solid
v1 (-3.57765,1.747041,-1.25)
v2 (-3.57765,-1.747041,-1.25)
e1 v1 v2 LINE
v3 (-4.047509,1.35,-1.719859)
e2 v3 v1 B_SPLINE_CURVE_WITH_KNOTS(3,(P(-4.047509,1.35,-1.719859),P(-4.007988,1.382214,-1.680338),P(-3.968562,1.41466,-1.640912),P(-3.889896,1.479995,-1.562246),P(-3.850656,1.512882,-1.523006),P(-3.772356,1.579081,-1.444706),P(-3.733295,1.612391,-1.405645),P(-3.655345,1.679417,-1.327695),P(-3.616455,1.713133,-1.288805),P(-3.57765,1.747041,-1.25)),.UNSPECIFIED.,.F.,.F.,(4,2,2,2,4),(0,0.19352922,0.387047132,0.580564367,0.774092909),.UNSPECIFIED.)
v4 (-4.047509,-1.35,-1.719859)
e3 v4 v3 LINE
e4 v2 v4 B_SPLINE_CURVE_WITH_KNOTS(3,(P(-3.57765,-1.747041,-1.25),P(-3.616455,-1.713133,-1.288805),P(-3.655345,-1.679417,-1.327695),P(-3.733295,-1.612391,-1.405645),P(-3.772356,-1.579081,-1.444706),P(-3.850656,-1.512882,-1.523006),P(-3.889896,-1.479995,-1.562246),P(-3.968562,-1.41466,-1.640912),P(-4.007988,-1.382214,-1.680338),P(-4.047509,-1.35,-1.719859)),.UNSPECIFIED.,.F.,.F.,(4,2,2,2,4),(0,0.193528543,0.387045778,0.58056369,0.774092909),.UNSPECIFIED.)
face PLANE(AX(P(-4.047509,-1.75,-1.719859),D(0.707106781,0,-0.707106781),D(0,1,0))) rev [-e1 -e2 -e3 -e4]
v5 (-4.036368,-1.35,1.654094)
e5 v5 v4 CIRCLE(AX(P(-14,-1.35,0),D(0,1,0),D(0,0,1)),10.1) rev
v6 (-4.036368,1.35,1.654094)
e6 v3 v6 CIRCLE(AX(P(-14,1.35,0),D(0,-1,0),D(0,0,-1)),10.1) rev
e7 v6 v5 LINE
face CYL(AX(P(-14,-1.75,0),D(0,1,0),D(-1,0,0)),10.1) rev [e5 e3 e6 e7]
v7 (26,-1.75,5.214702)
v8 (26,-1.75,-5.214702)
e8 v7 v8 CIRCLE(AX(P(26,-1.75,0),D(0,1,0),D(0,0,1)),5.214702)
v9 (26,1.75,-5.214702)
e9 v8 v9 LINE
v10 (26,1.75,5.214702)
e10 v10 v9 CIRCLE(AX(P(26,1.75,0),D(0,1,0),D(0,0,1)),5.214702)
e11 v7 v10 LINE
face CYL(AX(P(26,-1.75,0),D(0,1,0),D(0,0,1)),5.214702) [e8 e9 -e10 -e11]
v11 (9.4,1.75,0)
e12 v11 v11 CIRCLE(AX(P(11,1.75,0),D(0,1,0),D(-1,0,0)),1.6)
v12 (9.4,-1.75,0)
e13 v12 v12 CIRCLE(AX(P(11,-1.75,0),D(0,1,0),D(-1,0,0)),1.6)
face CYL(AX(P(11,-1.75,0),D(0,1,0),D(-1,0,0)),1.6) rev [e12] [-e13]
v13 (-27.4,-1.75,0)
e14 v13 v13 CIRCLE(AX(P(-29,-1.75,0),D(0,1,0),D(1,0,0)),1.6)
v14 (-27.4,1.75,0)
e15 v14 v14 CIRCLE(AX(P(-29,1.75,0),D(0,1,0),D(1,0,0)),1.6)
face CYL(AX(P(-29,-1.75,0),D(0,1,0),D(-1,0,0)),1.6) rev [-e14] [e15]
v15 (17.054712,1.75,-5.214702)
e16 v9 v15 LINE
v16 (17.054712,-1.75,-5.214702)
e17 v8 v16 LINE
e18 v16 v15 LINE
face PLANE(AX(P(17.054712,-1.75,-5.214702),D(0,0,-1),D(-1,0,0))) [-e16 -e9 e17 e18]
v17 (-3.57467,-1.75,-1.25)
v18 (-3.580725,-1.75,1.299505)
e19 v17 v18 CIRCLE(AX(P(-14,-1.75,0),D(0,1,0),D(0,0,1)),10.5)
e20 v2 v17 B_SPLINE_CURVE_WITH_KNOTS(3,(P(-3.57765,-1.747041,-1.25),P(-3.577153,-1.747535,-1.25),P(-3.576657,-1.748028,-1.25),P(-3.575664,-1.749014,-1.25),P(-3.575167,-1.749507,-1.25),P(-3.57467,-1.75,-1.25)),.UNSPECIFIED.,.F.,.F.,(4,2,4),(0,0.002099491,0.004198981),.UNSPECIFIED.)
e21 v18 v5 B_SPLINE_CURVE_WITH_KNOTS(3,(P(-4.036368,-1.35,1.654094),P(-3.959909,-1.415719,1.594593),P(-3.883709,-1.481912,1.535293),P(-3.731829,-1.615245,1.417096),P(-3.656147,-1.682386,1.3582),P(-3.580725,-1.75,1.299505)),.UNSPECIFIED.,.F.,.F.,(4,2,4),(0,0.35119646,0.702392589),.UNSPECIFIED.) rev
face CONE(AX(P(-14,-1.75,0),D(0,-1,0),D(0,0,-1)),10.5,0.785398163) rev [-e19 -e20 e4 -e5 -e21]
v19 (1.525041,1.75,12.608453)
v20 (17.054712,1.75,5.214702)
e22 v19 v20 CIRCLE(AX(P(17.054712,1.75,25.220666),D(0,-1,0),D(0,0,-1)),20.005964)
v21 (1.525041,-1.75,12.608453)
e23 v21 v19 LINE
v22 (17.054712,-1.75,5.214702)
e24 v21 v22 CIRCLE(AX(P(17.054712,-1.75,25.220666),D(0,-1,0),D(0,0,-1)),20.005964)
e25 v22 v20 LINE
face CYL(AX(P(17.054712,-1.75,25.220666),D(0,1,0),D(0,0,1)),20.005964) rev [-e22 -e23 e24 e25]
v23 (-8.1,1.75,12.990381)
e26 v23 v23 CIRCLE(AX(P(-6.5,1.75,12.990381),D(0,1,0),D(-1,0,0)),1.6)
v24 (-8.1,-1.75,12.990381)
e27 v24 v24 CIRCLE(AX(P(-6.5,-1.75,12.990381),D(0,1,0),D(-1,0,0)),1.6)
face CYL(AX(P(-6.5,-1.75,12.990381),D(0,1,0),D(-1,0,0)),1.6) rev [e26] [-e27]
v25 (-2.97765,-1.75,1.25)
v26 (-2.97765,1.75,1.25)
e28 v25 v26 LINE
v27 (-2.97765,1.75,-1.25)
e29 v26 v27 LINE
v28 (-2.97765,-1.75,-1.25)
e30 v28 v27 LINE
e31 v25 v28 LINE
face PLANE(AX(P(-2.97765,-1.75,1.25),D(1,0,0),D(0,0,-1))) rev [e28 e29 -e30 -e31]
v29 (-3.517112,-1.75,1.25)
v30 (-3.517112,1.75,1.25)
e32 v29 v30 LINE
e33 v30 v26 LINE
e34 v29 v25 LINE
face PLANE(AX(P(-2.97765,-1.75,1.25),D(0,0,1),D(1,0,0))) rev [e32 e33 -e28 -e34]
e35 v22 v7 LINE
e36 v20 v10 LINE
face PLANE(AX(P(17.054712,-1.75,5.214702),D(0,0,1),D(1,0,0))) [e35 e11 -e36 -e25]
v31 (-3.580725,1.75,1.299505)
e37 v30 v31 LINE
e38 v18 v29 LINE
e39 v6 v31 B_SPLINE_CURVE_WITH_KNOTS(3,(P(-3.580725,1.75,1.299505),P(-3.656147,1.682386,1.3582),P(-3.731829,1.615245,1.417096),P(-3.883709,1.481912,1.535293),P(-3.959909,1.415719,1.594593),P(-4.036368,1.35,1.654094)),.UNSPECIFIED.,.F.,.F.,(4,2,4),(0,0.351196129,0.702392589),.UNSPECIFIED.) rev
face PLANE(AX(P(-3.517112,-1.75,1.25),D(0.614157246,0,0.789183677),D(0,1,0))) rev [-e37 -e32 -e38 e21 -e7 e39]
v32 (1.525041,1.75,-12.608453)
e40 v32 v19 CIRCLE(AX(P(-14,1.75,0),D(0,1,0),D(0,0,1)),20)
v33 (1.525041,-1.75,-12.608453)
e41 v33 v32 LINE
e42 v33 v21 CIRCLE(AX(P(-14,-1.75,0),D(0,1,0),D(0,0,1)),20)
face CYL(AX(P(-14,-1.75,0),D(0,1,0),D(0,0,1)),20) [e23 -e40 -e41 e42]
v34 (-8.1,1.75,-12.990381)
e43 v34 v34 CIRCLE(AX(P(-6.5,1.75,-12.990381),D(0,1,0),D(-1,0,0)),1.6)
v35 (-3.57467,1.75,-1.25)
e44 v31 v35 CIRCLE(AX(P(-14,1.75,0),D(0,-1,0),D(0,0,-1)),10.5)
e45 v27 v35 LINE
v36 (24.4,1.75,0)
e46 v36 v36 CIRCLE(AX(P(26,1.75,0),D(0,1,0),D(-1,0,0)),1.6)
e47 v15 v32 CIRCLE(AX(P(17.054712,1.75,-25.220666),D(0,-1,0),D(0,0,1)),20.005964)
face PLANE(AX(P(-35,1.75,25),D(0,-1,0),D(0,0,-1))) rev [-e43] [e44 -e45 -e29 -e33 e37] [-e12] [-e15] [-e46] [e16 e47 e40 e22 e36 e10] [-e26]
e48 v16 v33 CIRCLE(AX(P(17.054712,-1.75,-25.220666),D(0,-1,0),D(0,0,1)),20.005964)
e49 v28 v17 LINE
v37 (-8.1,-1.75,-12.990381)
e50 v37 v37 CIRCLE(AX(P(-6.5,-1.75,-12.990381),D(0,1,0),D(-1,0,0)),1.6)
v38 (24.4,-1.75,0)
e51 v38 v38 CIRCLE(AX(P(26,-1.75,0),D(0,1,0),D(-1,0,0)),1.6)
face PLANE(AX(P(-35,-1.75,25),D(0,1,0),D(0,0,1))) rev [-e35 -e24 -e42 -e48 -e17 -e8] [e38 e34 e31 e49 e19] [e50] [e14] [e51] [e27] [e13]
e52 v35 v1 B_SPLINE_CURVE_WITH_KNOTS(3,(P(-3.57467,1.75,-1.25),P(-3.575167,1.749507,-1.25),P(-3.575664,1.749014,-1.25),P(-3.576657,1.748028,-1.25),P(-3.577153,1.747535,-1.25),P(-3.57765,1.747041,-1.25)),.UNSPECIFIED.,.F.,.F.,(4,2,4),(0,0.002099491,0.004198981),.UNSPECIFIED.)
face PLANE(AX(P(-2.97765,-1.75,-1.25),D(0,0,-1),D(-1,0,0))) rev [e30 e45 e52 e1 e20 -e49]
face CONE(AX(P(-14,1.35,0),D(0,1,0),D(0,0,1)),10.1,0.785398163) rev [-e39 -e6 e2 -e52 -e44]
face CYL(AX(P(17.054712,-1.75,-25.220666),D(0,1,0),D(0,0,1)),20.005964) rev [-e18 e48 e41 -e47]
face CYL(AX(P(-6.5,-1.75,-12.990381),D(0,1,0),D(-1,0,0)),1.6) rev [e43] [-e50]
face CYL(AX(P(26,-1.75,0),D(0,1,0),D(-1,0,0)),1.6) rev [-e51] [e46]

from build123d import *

# Parameters (mm, degrees)
SKETCH1_W           = 70
SKETCH1_H           = 3.5
BOSS_EXTRUDE1_DEPTH = 25
SKETCH2_R           = 10.1
SKETCH2_R_2         = 1.6
CUT_EXTRUDE1_DEPTH  = 44.153794735
SKETCH4_OUTSIDE_W   = 89.218
SKETCH4_OUTSIDE_H   = 69.218
CUT_EXTRUDE2_DEPTH  = 44.153794735
SKETCH5_W           = 1
SKETCH5_H           = 2.5
CUT_EXTRUDE3_DEPTH  = 40.601136347
CHAMFER1_SIZE       = 0.460537939
CHAMFER1_SIZE_2     = 0.4


with BuildPart() as part:
    # Sketch1 → Boss-Extrude1 (new, symmetric)
    with BuildSketch(Plane.XY):
        Rectangle(SKETCH1_W, SKETCH1_H)
    extrude(amount=BOSS_EXTRUDE1_DEPTH, both=True)

    # Sketch2 → Cut-Extrude1 (cut, through all)
    with BuildSketch(Plane(origin=(0, 1.75, 0), x_dir=(1, 0, 0), z_dir=(0, 1, 0))):
        with Locations(Location((-14, 0, 0), (0, 0, 180))):
            Circle(SKETCH2_R)
        with Locations((-29, 0)):
            Circle(SKETCH2_R_2)
        with Locations(Location((-6.5, 12.990381057, 0), (0, 0, 180))):
            Circle(SKETCH2_R_2)
        with Locations(Location((-6.5, -12.990381057, 0), (0, 0, 180))):
            Circle(SKETCH2_R_2)
        with Locations(Location((11, 0, 0), (0, 0, 180))):
            Circle(SKETCH2_R_2)
        with Locations(Location((26, 0, 0), (0, 0, 180))):
            Circle(SKETCH2_R_2)
    extrude(amount=-CUT_EXTRUDE1_DEPTH, mode=Mode.SUBTRACT)

    # Sketch4 outside → Cut-Extrude2 (cut, through all)
    with BuildSketch(Plane(origin=(0, 1.75, 0), x_dir=(1, 0, 0), z_dir=(0, 1, 0))):
        Rectangle(SKETCH4_OUTSIDE_W, SKETCH4_OUTSIDE_H)
        with BuildLine():
            Line((17.054712149, -5.214702174), (26, -5.214702174))
            ThreePointArc((26, -5.214702174), (31.214702174, 0), (26, 5.214702174))
            Line((26, 5.214702174), (17.054712149, 5.214702174))
            ThreePointArc((17.054712149, 5.214702174), (8.454737914, 7.157470503), (1.525041378, 12.608453125))
            ThreePointArc((1.525041378, 12.608453125), (-34, 0), (1.525041378, -12.608453125))
            ThreePointArc((1.525041378, -12.608453125), (8.454737914, -7.157470503), (17.054712149, -5.214702174))
        make_face(mode=Mode.SUBTRACT)
    extrude(amount=-CUT_EXTRUDE2_DEPTH, mode=Mode.SUBTRACT)

    # Sketch5 → Cut-Extrude3 (cut, through all)
    with BuildSketch(Plane(origin=(0, 1.75, 0), x_dir=(1, 0, 0), z_dir=(0, 1, 0))):
        with Locations((-3.477649976, 0)):
            Rectangle(SKETCH5_W, SKETCH5_H)
    extrude(amount=-CUT_EXTRUDE3_DEPTH, mode=Mode.SUBTRACT)

    # Chamfer1
    # the kernel refuses this chamfer: 0.460537939, 0.4 mm, written as the material it takes off along each edge
    with BuildSketch(Plane(origin=(-3.977649976, 2.93802649, 1.25), x_dir=(1, 0, 0), z_dir=(0, -1, 0))) as chamfer1_piece_1:
        with BuildLine():
            Line((CHAMFER1_SIZE, 0), (-0.058717526, 0.404094149))
            ThreePointArc((-0.058717526, 0.404094149), (-0.028274639, 0.208923305), (0, 0))
            Line((0, 0), (CHAMFER1_SIZE, 0))
        make_face()
    extrude(amount=5.876052981, mode=Mode.SUBTRACT)
    with BuildSketch(Plane(origin=(-3.977649976, 2.974865586, -1.25), x_dir=(-0.1470633692519934, 0, -0.9891270724352114), z_dir=(0, -1, 0))) as chamfer1_piece_2:
        with BuildLine():
            Line((0.475023444, 0), (-CHAMFER1_SIZE_2 * 0.147063369252, CHAMFER1_SIZE_2 * 0.989127072435))
            Line((-CHAMFER1_SIZE_2 * 0.147063369252, CHAMFER1_SIZE_2 * 0.989127072435), (0, 0))
            ThreePointArc((0, 0), (0.244917786, 0.002790335), (0.475023444, 0))
        make_face()
    extrude(amount=5.949731171, mode=Mode.SUBTRACT)
    # the kernel refuses this chamfer: 0.460537939, 0.4 mm, written as the material it takes off along each edge
    with BuildSketch(Plane(origin=(-14, -1.75, 0), x_dir=(0.9980739544649045, 0, 0.062035323959722194), z_dir=(0.062035323959722194, 0, -0.9980739544649045))) as chamfer1_2_piece_1:
        Polygon((10.1 + CHAMFER1_SIZE_2, 0), (10.1, -CHAMFER1_SIZE_2), (10.1, 0), align=None)
    revolve(axis=Axis((-14, -1.75, 0), (0, -1, 0)), revolution_arc=352.508320322, mode=Mode.SUBTRACT)
    with BuildSketch(Plane(origin=(-14, 1.75, 0), x_dir=(0.9980739544649045, 0, 0.06203532395972309), z_dir=(0.06203532395972309, 0, -0.9980739544649045))) as chamfer1_2_piece_2:
        Polygon((10.1 + CHAMFER1_SIZE_2, 0), (10.1, CHAMFER1_SIZE_2), (10.1, 0), align=None)
    revolve(axis=Axis((-14, 1.75, 0), (0, -1, 0)), revolution_arc=352.508320322, mode=Mode.SUBTRACT)


solid = part.part
